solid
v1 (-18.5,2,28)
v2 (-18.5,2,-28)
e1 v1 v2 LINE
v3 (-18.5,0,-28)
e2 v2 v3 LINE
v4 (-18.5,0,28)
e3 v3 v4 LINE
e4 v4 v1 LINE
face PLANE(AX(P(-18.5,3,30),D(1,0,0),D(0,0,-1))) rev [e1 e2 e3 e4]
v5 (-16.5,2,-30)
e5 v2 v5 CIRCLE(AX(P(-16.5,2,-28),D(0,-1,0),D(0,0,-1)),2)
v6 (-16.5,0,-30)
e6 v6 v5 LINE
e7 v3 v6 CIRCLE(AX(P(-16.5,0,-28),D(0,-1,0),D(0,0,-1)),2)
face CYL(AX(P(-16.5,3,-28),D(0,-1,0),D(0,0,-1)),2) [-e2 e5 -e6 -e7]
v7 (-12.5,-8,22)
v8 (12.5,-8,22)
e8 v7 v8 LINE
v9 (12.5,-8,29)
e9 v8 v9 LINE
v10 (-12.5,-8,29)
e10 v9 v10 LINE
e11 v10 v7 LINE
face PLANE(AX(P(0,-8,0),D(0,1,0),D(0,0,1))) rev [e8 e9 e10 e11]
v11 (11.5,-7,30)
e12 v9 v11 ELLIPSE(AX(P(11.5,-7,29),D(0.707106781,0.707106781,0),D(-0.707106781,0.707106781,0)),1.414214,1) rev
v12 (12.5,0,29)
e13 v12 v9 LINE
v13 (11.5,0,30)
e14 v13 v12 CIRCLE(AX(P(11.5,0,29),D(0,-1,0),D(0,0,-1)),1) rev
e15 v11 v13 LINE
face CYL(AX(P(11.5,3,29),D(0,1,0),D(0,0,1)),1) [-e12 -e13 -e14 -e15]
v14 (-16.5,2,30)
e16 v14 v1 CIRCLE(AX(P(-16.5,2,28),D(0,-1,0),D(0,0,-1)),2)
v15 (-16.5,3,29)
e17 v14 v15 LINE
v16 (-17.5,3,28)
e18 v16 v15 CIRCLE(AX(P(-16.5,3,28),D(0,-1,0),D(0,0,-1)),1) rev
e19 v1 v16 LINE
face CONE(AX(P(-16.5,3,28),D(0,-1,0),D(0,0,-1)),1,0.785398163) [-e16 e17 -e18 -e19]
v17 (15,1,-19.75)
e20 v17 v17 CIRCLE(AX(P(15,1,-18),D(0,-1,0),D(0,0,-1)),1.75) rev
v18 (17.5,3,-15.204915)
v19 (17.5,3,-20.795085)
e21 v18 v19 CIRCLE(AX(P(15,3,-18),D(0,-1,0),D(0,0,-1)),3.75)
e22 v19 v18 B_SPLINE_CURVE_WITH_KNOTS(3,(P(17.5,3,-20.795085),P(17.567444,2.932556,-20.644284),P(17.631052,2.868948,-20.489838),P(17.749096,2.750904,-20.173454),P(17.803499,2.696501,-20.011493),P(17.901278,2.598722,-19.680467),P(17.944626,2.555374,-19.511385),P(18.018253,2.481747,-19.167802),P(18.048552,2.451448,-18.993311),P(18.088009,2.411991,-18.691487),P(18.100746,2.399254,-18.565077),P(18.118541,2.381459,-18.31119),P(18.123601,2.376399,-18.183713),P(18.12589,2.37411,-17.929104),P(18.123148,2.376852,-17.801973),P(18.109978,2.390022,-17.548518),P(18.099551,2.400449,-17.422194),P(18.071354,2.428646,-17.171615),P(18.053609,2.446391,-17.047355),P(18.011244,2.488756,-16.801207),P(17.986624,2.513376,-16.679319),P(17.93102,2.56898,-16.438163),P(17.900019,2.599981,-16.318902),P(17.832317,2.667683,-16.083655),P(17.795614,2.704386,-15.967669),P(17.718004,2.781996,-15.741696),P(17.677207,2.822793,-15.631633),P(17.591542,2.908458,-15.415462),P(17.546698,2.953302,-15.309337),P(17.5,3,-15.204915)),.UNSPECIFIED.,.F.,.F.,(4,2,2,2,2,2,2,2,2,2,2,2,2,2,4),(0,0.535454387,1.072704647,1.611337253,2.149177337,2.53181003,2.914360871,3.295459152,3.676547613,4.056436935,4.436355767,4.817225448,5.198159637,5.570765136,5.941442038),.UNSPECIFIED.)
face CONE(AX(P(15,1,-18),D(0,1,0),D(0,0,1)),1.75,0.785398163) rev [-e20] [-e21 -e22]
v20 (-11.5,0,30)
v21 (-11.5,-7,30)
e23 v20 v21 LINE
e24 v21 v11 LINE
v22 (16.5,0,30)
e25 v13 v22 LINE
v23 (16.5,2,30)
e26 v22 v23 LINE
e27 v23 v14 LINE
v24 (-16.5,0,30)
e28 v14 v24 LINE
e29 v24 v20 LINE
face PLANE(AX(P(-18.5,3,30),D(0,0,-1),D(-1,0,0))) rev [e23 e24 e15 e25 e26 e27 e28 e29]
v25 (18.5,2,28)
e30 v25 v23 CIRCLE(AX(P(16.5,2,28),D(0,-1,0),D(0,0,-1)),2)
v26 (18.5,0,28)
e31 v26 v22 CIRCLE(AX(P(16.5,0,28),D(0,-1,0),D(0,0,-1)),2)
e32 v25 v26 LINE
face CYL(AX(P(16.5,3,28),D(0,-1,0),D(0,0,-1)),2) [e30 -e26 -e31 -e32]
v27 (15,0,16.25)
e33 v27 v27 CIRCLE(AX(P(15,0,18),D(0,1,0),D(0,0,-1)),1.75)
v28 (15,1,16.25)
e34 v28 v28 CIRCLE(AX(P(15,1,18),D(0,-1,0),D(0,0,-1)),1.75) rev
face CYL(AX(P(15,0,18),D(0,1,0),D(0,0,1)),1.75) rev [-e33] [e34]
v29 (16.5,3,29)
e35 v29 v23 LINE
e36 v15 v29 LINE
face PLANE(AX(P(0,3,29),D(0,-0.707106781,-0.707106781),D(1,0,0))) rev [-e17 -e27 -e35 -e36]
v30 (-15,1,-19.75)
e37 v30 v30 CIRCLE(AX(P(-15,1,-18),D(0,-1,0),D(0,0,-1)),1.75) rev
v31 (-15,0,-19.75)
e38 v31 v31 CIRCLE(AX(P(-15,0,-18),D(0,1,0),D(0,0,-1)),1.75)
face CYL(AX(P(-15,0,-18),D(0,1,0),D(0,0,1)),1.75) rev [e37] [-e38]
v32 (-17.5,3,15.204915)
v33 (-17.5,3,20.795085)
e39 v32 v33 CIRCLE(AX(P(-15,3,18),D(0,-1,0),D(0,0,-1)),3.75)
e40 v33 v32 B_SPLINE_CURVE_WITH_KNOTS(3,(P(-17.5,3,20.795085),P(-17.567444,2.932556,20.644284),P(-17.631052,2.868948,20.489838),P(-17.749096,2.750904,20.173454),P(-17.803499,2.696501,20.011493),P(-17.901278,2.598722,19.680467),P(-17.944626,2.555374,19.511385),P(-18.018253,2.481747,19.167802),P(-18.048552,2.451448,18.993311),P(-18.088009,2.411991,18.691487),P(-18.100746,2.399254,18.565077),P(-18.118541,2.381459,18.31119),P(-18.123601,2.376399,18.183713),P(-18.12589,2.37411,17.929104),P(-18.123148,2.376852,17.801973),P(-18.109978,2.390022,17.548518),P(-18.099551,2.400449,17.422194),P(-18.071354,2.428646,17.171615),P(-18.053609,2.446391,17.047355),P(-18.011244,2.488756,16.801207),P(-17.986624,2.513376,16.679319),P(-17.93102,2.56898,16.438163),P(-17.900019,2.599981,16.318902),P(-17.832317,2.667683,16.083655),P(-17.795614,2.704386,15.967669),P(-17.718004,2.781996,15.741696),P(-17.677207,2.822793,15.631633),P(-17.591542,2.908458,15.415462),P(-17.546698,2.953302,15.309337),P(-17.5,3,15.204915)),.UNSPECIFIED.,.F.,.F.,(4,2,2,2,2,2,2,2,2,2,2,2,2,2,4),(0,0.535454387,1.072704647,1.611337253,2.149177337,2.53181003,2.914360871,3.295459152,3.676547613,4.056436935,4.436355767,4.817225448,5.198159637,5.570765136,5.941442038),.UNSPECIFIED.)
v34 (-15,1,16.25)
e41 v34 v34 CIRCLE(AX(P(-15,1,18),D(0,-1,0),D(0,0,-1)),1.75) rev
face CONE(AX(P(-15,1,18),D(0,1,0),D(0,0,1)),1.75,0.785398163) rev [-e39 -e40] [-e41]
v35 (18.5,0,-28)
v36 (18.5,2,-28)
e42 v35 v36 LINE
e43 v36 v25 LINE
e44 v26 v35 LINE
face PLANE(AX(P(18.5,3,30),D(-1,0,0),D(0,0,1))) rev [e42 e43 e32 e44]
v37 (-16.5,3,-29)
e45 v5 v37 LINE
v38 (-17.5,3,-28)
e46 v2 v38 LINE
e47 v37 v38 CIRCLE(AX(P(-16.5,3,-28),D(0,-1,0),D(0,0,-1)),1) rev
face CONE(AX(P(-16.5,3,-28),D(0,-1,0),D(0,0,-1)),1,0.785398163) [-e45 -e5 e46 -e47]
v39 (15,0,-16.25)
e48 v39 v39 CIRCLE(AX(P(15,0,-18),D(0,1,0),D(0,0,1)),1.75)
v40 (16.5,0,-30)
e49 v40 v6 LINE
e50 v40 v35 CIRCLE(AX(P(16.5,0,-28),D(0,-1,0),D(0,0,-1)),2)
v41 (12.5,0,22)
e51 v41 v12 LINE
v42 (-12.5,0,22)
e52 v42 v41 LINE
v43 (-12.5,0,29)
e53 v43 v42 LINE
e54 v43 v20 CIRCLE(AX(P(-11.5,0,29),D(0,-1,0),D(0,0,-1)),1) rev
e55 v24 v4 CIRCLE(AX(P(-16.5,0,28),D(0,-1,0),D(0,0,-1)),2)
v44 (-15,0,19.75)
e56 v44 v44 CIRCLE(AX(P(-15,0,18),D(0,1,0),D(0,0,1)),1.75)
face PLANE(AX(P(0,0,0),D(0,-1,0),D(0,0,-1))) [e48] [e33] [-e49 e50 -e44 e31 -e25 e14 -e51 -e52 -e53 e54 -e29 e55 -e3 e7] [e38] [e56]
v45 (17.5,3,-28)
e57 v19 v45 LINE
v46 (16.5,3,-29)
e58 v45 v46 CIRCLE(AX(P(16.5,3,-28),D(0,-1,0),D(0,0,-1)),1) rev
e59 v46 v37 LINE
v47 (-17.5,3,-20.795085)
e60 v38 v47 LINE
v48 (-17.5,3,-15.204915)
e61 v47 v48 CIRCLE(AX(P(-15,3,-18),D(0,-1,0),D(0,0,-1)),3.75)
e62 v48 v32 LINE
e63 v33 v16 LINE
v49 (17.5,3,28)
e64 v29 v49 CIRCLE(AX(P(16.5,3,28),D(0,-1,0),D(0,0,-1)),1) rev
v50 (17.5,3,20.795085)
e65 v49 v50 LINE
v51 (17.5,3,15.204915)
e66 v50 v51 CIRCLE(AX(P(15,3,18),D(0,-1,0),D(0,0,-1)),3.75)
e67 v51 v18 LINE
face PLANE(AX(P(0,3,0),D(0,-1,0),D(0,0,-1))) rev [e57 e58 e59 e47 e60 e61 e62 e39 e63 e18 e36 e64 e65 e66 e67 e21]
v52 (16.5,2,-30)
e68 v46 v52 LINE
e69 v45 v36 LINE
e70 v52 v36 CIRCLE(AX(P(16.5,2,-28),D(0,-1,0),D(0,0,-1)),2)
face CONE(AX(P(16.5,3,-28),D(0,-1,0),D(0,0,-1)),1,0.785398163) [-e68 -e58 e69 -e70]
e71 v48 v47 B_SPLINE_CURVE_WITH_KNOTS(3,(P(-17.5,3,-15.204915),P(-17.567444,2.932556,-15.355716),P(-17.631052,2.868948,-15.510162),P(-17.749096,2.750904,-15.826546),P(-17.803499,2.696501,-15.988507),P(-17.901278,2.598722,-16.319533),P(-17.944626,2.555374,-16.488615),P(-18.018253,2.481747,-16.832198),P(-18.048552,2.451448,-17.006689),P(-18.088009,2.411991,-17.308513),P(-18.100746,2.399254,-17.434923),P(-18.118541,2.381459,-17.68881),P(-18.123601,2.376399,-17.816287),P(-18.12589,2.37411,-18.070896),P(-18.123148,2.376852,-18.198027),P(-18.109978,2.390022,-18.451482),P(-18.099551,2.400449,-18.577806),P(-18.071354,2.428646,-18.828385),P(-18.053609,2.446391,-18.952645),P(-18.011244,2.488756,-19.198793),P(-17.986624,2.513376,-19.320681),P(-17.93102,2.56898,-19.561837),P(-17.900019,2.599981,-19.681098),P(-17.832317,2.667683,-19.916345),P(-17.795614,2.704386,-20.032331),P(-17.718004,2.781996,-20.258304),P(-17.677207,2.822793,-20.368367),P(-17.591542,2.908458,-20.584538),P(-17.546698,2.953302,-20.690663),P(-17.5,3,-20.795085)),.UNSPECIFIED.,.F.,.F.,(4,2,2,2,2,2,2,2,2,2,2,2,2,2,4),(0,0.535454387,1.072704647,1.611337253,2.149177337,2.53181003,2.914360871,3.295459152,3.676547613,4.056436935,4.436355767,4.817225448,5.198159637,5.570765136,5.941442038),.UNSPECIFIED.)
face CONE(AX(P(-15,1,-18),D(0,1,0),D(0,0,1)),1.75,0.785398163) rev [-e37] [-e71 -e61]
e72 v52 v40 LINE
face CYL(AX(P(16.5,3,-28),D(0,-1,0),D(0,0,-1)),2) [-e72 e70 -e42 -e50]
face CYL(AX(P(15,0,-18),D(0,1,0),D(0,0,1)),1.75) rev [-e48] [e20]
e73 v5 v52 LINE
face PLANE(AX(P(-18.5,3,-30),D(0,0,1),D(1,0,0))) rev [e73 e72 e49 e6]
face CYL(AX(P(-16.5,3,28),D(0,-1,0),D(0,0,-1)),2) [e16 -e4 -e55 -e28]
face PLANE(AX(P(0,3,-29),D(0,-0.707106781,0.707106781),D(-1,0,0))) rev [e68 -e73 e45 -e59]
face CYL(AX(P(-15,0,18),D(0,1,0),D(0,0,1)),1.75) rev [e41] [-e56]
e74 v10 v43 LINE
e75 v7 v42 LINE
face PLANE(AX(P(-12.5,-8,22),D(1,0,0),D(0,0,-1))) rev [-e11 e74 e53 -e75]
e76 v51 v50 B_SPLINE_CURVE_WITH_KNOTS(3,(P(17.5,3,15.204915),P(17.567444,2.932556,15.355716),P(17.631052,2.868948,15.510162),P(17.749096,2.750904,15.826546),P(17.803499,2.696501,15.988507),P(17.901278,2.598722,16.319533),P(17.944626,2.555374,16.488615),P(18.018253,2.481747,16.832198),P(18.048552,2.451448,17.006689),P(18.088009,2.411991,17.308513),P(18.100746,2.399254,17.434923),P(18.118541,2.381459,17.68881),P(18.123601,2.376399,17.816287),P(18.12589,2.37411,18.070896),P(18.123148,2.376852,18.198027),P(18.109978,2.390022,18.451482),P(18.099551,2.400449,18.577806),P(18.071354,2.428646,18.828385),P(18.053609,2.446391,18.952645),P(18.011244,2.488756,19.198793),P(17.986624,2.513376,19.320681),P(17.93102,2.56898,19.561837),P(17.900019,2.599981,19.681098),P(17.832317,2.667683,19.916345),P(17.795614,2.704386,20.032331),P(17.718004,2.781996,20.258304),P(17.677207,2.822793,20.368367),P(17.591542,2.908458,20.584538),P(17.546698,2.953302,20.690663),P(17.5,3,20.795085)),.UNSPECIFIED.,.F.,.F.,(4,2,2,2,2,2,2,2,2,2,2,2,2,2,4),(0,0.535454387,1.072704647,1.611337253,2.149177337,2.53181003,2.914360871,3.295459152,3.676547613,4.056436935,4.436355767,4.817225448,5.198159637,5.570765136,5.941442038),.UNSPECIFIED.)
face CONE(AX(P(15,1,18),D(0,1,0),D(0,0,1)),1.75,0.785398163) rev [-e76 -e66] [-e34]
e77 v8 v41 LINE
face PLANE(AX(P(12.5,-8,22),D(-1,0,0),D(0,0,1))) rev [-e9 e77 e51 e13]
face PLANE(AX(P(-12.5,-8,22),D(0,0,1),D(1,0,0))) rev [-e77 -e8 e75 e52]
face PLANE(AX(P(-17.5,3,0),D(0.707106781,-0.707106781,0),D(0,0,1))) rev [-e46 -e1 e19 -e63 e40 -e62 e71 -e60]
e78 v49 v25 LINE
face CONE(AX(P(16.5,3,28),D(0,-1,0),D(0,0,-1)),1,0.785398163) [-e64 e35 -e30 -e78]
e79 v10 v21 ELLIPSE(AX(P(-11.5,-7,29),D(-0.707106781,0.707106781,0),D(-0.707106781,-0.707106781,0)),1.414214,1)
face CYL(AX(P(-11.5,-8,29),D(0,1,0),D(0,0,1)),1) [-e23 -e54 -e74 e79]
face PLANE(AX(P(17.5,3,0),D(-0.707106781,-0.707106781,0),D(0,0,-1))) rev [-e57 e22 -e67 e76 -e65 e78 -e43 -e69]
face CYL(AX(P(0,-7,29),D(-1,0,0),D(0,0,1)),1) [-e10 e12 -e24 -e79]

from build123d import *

# Parameters (mm, degrees)
SKETCH_1_W          = 37
SKETCH_1_H          = 60
EXTRUDE_1_DEPTH     = 3
SKETCH_2_R          = 1.75
CUT_EXTRUDE_1_DEPTH = 3
FILLET_1_R          = 2
SKETCH_3_W          = 25
SKETCH_3_H          = 8
EXTRUDE_2_DEPTH     = 8
FILLET_2_R          = 1
CHAMFER_2_SIZE      = 1
CHAMFER_1_SIZE      = 2


with BuildPart() as part:
    # Эскиз1 → Бобышка-Вытянуть1 (new body)
    with BuildSketch(Plane(origin=(0, 0, 0), x_dir=(1, 0, 0), z_dir=(0, 1, 0))):
        Rectangle(SKETCH_1_W, SKETCH_1_H)
    extrude(amount=EXTRUDE_1_DEPTH)

    # Эскиз2 → Вырез-Вытянуть1 (cut)
    with BuildSketch(Plane(origin=(0, 3, 0), x_dir=(1, 0, 0), z_dir=(0, 1, 0))):
        with Locations(Location((15, 18, 0), (0, 0, 270))):
            Circle(SKETCH_2_R)
        with Locations(Location((15, -18, 0), (0, 0, 90))):
            Circle(SKETCH_2_R)
        with Locations(Location((-15, -18, 0), (0, 0, 270))):
            Circle(SKETCH_2_R)
        with Locations(Location((-15, 18, 0), (0, 0, 90))):
            Circle(SKETCH_2_R)
    extrude(amount=-CUT_EXTRUDE_1_DEPTH, mode=Mode.SUBTRACT)

    # Скругление1
    fillet_1_edges = [part.edges().sort_by_distance(p)[0] for p in [
        (18.5, 1.5, 30),
        (-18.5, 1.5, 30),
        (-18.5, 1.5, -30),
        (18.5, 1.5, -30),
    ]]
    fillet(fillet_1_edges, radius=FILLET_1_R)

    # Эскиз3 → Бобышка-Вытянуть2 (add)
    with BuildSketch(Plane.XZ):
        with Locations((0, 26)):
            Rectangle(SKETCH_3_W, SKETCH_3_H)
    extrude(amount=EXTRUDE_2_DEPTH)

    # Скругление2
    fillet_2_edges = [part.edges().sort_by_distance(p)[0] for p in [
        (12.5, -4, 30),
        (-12.5, -4, 30),
        (0, -8, 30),
    ]]
    fillet(fillet_2_edges, radius=FILLET_2_R)

    # Фаска2
    chamfer_2_edges = [part.edges().sort_by_distance(p)[0] for p in [
        (0, 3, -30),
        (18.5, 3, 0),
        (-18.5, 3, 0),
        (0, 3, 30),
        (17.914213562, 3, 29.414213562),
        (-17.914213562, 3, 29.414213562),
        (-17.914213562, 3, -29.414213562),
        (17.914213562, 3, -29.414213562),
    ]]
    chamfer(chamfer_2_edges, length=CHAMFER_2_SIZE)

    # Фаска1
    # the kernel refuses this chamfer: 2 mm, written as the material it takes off along each edge
    with BuildSketch(Plane(origin=(-15, 3, -18), x_dir=(0, 0, -1), z_dir=(1, 0, 0))) as chamfer_1_piece_1:
        Polygon((1.75 + CHAMFER_1_SIZE, 0), (1.75, -CHAMFER_1_SIZE), (1.75, 0), align=None)
    revolve(axis=Axis((-15, 3, -18), (0, 1, 0)), mode=Mode.SUBTRACT)
    with BuildSketch(Plane(origin=(-15, 3, 18), x_dir=(0, 0, 1), z_dir=(-1, 0, 0))) as chamfer_1_piece_2:
        Polygon((1.75 + CHAMFER_1_SIZE, 0), (1.75, -CHAMFER_1_SIZE), (1.75, 0), align=None)
    revolve(axis=Axis((-15, 3, 18), (0, 1, 0)), mode=Mode.SUBTRACT)
    with BuildSketch(Plane(origin=(15, 3, 18), x_dir=(0, 0, -1), z_dir=(1, 0, 0))) as chamfer_1_piece_3:
        Polygon((1.75 + CHAMFER_1_SIZE, 0), (1.75, -CHAMFER_1_SIZE), (1.75, 0), align=None)
    revolve(axis=Axis((15, 3, 18), (0, 1, 0)), mode=Mode.SUBTRACT)
    with BuildSketch(Plane(origin=(15, 3, -18), x_dir=(0, 0, 1), z_dir=(-1, 0, 0))) as chamfer_1_piece_4:
        Polygon((1.75 + CHAMFER_1_SIZE, 0), (1.75, -CHAMFER_1_SIZE), (1.75, 0), align=None)
    revolve(axis=Axis((15, 3, -18), (0, 1, 0)), mode=Mode.SUBTRACT)


solid = part.part
